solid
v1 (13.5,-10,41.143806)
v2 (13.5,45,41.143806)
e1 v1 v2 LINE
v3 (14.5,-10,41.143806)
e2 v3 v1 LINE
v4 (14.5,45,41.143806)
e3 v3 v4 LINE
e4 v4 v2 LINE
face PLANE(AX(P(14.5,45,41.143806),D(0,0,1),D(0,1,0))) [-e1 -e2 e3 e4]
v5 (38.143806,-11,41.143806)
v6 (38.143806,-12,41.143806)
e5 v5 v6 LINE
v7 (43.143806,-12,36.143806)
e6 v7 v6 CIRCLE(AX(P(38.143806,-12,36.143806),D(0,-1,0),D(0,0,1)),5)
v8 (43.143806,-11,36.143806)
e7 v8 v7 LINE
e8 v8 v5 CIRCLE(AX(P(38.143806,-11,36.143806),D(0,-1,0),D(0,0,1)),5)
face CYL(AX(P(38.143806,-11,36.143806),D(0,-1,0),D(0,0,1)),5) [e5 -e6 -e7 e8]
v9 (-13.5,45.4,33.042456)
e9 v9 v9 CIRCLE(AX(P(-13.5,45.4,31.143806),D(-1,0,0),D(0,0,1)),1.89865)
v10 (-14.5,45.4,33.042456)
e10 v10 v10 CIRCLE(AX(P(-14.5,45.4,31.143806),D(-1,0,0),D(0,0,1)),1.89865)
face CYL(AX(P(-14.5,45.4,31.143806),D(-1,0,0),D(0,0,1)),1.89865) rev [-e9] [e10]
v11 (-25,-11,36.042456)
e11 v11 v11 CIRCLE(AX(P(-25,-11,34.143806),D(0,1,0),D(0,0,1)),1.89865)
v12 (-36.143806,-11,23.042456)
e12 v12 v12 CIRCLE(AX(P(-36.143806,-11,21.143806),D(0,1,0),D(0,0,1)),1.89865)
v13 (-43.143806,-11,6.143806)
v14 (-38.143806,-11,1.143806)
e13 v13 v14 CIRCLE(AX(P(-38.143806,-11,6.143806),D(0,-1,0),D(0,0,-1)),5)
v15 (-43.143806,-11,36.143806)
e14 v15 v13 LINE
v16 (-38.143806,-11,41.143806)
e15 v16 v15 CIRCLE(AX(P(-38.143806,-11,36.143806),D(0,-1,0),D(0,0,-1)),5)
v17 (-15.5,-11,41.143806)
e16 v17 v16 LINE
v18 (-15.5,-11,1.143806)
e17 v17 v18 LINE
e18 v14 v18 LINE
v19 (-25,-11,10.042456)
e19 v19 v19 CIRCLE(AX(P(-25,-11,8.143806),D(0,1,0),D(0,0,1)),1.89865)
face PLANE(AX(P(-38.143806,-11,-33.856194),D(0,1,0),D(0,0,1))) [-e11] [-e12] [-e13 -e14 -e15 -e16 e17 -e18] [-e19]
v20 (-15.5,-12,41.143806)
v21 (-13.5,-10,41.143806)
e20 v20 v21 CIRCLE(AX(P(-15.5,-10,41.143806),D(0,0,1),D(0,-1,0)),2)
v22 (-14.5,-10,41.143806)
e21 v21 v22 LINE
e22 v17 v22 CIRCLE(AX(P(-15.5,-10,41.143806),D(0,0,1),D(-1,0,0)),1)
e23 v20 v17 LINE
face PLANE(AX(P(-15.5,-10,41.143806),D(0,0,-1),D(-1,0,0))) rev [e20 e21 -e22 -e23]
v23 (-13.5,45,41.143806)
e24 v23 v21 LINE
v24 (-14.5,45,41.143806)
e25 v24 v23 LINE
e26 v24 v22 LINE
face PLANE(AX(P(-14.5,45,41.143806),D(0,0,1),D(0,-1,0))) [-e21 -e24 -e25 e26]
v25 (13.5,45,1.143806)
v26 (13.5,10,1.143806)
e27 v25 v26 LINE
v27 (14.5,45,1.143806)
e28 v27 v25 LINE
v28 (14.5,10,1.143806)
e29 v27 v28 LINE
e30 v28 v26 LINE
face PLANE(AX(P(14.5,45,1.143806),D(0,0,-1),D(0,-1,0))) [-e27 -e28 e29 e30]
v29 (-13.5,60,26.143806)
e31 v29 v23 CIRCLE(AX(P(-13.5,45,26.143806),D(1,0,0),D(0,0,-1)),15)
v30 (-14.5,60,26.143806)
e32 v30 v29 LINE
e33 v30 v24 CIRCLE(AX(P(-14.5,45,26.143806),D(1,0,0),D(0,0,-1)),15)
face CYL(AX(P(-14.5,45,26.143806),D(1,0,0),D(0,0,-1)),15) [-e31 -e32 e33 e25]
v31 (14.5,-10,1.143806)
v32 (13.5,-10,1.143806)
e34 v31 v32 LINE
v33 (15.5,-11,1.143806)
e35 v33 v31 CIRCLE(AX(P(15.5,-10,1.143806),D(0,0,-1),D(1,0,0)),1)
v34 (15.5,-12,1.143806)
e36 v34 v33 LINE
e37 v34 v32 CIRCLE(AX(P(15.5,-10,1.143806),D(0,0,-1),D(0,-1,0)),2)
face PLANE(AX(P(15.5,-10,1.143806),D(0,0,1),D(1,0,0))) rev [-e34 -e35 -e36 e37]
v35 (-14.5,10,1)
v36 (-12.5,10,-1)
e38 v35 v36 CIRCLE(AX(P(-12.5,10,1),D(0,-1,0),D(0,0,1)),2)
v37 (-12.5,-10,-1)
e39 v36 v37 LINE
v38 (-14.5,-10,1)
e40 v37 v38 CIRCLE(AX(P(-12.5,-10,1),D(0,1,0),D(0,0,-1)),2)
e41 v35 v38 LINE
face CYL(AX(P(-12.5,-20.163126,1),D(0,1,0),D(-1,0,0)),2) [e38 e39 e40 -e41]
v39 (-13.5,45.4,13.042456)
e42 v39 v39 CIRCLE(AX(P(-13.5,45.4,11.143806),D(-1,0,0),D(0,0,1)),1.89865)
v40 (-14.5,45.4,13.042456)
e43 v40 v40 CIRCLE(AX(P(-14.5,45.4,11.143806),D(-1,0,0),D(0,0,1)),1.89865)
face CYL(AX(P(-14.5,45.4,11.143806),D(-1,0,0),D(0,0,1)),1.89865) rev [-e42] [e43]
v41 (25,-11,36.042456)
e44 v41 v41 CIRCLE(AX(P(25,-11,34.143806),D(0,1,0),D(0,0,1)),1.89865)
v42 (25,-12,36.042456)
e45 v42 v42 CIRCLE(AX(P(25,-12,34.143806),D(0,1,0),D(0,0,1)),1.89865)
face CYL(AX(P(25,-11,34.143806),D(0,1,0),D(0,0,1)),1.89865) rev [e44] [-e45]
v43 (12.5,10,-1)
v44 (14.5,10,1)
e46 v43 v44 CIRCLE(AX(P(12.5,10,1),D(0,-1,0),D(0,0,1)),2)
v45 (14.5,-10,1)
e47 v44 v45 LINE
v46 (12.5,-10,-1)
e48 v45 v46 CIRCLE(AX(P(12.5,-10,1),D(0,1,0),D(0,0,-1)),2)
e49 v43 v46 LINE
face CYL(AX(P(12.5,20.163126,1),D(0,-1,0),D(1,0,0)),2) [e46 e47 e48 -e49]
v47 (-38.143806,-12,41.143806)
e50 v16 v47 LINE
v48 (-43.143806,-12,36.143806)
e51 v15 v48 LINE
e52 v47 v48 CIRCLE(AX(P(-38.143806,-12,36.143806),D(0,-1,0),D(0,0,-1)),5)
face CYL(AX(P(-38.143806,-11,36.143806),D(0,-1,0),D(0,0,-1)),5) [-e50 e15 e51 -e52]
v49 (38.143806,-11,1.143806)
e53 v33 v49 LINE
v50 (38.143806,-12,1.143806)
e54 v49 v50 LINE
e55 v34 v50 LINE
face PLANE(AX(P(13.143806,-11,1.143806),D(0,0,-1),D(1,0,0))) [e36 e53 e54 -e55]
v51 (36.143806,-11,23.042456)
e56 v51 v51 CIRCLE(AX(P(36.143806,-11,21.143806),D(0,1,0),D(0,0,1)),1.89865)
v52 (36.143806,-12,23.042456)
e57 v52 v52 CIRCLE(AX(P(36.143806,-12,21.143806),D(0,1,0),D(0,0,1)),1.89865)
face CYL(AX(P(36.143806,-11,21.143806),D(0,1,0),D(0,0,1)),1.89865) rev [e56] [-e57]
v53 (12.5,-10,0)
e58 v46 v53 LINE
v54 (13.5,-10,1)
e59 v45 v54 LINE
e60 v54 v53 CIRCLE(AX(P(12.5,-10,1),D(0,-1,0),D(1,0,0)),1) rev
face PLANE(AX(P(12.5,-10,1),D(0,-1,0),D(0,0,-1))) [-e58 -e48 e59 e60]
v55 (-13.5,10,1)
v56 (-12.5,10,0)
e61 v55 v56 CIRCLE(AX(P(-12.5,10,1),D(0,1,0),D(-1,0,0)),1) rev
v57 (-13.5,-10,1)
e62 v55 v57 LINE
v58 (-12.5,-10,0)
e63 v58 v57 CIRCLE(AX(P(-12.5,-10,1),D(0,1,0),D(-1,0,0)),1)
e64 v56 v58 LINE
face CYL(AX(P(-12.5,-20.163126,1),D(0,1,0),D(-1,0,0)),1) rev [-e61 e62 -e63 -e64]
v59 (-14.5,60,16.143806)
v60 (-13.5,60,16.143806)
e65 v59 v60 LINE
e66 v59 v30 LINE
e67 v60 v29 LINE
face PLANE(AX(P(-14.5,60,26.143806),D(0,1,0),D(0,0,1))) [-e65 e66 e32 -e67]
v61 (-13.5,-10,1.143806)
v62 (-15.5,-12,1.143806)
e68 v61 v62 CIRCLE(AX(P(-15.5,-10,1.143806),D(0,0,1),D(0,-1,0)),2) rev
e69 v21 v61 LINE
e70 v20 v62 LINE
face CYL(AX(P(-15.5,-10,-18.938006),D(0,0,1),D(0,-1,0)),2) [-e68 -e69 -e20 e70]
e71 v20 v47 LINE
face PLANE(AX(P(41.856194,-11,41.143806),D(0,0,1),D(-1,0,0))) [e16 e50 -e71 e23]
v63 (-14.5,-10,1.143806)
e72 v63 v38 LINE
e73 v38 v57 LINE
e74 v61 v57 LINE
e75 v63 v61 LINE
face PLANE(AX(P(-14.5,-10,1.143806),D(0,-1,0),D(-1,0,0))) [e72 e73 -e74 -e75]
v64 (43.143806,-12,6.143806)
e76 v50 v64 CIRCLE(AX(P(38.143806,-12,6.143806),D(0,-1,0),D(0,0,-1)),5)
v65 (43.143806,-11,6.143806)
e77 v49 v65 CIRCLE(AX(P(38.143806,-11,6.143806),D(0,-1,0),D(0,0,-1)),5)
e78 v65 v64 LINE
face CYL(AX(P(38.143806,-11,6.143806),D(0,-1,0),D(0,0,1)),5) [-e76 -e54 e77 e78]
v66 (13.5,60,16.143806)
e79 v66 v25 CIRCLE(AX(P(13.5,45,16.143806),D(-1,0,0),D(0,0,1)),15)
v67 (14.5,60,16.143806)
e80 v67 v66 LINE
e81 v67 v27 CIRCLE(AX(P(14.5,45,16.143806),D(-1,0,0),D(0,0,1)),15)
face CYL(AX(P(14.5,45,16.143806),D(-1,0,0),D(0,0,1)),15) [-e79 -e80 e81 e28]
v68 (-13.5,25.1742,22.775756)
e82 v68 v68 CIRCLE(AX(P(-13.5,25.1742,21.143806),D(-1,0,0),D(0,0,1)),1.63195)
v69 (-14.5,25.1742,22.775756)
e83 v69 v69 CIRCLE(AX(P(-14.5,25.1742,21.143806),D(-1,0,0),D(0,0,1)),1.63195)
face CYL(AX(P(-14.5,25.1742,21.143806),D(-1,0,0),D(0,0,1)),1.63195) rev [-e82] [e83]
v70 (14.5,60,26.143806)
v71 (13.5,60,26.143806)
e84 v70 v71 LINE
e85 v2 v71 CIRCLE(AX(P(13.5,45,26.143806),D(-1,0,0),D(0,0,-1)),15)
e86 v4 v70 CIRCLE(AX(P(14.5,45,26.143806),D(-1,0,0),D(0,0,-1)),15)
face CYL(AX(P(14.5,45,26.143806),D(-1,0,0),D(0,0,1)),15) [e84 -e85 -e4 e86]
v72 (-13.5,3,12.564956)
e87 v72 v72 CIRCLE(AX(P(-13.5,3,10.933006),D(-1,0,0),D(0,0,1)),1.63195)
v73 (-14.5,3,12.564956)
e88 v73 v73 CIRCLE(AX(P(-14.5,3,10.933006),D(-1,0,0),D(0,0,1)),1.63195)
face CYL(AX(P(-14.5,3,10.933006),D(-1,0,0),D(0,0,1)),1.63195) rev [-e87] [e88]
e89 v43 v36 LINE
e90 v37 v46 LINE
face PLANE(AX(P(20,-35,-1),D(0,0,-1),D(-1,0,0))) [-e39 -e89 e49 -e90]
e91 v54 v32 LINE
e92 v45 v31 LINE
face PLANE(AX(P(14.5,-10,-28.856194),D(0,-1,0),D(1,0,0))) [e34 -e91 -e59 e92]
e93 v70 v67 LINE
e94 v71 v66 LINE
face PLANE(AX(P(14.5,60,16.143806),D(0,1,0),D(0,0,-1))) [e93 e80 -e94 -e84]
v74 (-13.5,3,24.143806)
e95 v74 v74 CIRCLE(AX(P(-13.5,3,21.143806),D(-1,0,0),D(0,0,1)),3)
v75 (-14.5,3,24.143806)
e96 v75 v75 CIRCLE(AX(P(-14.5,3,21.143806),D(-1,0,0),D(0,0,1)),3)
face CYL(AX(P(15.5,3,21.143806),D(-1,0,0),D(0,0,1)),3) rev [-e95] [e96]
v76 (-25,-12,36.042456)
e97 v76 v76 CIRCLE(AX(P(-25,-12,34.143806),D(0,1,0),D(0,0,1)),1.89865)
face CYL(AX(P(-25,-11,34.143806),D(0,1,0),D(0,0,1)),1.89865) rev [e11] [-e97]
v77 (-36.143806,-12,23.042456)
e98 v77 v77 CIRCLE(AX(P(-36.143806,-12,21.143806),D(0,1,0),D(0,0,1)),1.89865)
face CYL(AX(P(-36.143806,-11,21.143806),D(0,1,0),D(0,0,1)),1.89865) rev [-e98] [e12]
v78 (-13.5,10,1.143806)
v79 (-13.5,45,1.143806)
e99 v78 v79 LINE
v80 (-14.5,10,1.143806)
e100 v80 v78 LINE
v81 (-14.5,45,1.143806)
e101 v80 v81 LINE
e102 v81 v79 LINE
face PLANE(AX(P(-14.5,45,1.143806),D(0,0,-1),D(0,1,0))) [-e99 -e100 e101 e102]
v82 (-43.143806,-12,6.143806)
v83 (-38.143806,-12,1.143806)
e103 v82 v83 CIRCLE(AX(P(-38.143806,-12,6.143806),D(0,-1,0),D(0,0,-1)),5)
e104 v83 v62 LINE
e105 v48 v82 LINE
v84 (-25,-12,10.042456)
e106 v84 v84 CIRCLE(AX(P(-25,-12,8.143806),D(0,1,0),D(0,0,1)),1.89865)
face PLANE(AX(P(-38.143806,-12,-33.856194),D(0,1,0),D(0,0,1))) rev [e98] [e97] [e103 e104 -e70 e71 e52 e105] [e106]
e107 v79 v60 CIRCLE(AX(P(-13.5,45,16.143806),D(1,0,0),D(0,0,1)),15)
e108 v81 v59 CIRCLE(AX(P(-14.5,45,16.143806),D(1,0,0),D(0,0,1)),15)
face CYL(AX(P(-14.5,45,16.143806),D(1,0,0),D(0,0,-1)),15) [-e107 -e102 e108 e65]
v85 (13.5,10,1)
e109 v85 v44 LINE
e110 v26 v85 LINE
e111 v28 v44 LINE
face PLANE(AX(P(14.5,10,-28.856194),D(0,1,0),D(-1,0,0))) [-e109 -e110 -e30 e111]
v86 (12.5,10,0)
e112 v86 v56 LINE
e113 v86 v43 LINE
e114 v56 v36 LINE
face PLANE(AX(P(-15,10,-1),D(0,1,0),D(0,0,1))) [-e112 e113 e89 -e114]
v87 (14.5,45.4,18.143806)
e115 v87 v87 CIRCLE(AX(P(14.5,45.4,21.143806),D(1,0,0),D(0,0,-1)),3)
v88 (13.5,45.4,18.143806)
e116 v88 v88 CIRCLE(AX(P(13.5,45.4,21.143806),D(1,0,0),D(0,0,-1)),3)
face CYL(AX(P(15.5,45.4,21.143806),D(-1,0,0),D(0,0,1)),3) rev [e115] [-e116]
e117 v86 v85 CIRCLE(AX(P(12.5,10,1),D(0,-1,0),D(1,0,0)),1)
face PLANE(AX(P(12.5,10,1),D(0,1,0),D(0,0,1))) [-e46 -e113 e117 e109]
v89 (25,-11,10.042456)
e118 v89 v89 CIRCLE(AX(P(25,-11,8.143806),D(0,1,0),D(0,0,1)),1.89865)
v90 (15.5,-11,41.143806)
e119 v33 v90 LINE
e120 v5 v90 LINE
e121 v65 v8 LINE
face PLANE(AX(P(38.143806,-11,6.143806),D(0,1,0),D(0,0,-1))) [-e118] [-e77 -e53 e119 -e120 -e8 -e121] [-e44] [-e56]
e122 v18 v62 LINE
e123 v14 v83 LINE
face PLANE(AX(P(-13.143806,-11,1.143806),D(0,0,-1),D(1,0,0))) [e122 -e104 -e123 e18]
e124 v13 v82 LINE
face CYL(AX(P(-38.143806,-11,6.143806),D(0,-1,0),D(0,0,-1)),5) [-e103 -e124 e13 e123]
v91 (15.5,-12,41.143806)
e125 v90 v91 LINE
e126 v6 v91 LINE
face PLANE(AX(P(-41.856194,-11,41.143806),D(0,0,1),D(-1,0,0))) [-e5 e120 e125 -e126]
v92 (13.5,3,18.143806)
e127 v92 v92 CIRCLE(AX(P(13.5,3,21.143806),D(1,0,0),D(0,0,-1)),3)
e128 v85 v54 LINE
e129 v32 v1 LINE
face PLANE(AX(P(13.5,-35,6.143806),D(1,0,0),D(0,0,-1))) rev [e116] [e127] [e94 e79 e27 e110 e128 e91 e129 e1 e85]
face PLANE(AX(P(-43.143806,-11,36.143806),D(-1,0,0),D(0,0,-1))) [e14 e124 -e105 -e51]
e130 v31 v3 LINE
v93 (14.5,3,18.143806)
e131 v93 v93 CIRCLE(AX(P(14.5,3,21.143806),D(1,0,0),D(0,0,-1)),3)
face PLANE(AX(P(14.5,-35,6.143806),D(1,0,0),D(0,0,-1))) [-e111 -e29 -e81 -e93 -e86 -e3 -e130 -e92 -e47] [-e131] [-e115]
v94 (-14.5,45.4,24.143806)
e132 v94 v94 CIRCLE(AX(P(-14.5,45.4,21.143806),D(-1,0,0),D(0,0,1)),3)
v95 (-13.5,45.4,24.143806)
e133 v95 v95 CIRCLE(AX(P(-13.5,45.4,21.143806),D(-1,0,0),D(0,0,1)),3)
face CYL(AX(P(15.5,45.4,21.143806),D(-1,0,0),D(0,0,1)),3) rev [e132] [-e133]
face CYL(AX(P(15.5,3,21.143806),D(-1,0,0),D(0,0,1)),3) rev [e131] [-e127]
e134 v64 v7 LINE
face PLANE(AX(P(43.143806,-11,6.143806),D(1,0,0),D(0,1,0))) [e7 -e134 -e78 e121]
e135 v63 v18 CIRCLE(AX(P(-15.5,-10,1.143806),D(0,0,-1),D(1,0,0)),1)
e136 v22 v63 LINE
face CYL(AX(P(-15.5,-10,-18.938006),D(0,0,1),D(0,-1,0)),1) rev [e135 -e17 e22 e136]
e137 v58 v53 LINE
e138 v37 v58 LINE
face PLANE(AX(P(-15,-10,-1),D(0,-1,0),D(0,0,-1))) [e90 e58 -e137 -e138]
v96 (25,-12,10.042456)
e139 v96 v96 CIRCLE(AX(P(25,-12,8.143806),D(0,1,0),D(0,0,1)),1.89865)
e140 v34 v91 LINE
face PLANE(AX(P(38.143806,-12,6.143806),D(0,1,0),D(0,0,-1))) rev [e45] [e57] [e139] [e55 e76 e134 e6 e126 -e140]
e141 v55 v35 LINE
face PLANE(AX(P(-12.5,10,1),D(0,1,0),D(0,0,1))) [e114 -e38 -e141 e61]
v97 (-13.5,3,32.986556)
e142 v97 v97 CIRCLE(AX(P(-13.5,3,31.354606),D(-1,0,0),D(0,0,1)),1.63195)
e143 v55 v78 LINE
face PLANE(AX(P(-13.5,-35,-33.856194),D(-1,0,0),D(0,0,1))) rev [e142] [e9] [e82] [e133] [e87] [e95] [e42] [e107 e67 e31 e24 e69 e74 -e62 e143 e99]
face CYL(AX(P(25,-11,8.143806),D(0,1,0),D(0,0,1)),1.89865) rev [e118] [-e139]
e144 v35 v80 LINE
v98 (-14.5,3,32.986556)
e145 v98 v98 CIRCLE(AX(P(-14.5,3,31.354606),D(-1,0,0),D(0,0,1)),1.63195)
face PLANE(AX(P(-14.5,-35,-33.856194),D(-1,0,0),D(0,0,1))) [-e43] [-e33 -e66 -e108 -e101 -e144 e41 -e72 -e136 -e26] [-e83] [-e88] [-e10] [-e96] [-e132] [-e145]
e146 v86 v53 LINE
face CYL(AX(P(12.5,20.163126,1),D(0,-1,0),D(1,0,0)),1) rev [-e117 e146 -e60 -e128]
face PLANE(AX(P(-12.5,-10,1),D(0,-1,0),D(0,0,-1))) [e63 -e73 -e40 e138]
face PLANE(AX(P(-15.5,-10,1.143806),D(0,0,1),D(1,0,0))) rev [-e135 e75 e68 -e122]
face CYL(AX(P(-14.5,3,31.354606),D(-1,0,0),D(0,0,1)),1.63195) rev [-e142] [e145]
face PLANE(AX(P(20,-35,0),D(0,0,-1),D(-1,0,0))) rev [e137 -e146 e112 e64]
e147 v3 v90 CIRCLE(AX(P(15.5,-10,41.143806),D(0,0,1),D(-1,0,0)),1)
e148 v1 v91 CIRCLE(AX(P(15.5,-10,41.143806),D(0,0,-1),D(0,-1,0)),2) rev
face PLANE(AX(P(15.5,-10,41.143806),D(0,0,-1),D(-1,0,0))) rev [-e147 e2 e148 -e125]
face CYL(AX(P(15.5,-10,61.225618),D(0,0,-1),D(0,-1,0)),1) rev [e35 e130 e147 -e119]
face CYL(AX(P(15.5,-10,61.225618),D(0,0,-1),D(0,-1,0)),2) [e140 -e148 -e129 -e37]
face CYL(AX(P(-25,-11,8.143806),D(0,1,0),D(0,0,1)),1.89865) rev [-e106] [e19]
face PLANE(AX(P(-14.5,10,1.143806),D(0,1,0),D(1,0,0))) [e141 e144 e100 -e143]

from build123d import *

# Parameters (mm, degrees)
BASE_FLANGE1_DEPTH         = 1
SKETCHED_START             = -40
SKETCHED_BEND3_OUTLINE_W   = 40
SKETCHED_BEND3_OUTLINE_H   = 1
SKETCHED_BEND3_DEPTH       = 28.18876
SKETCHED_START_2           = -11.2192
SKETCHED_BEND3_2_DEPTH     = 0.2192
SKETCHED_START_3           = -12
SKETCHED_BEND3_3_DEPTH     = 2
SKETCHED_START_4           = -56
SKETCHED_BEND3_4_DEPTH     = 112
SKETCHED_BEND7_DEPTH       = 72
SKETCHED_START_5           = -10
SKETCHED_BEND7_2_OUTLINE_W = 1
SKETCHED_BEND7_2_OUTLINE_H = 40
SKETCHED_BEND7_2_DEPTH     = 55
SKETCHED_BEND7_3_DEPTH     = 20
SKETCHED_BEND7_4_DEPTH     = 2
SKETCHED_START_6           = 45
SKETCHED_BEND7_5_OUTLINE_W = 1
SKETCHED_BEND7_5_OUTLINE_H = 40
SKETCHED_BEND7_5_DEPTH     = 15
SKETCHED_START_7           = 1.14380551
SKETCHED_BEND7_6_DEPTH     = 40
SKETCHED_START_8           = -38.14380551
SKETCHED_BEND7_7_DEPTH     = 76.28761102
SKETCH9_R                  = 3
CUT_EXTRUDE1_DEPTH         = 30
F_4_CLEARANCE_HOLE1_D      = 3.2639
F_4_CLEARANCE_HOLE1_DEPTH  = 3
F_4_CLEARANCE_HOLE1_TIP    = 0.980574487
F_6_CLEARANCE_HOLE1_D      = 3.7973
F_6_CLEARANCE_HOLE1_DEPTH  = 3
F_6_CLEARANCE_HOLE1_TIP    = 1.140824014
F_6_CLEARANCE_HOLE2_D      = 3.7973


with BuildPart() as part:
    # Base-Flange1: sheet metal written as solids
    # Sketch1 → Base-Flange1 (new body)
    with BuildSketch(Plane.XY):
        with BuildLine():
            Line((-15, -10), (-15, -35))
            ThreePointArc((-15, -35), (-16.464466094, -38.535533906), (-20, -40))
            Line((-20, -40), (-50, -40))
            ThreePointArc((-50, -40), (-53.535533906, -38.535533906), (-55, -35))
            Line((-55, -35), (-55, 45))
            ThreePointArc((-55, 45), (-50.606601718, 55.606601718), (-40, 60))
            Line((-40, 60), (-30, 60))
            ThreePointArc((-30, 60), (-19.393398282, 55.606601718), (-15, 45))
            Line((-15, 45), (-15, 10))
            Line((-15, 10), (15, 10))
            Line((15, 10), (15, 45))
            ThreePointArc((15, 45), (19.393398282, 55.606601718), (30, 60))
            Line((30, 60), (40, 60))
            ThreePointArc((40, 60), (50.606601718, 55.606601718), (55, 45))
            Line((55, 45), (55, -35))
            ThreePointArc((55, -35), (53.535533906, -38.535533906), (50, -40))
            Line((50, -40), (20, -40))
            ThreePointArc((20, -40), (16.464466094, -38.535533906), (15, -35))
            Line((15, -35), (15, -10))
            Line((15, -10), (-15, -10))
        make_face()
    extrude(amount=-BASE_FLANGE1_DEPTH)

    # Sketched Bend3: read off the stored shape, not the designer's step
    # Sketched Bend3 outline → Sketched Bend3 (cut)
    with BuildSketch(Plane(origin=(0, 0, 0), x_dir=(1, 0, 0), z_dir=(0, 1, 0)).offset(SKETCHED_START)):
        with Locations((-35, 0.5)):
            Rectangle(SKETCHED_BEND3_OUTLINE_W, SKETCHED_BEND3_OUTLINE_H)
        with Locations((35, 0.5)):
            Rectangle(SKETCHED_BEND3_OUTLINE_W, SKETCHED_BEND3_OUTLINE_H)
    extrude(amount=SKETCHED_BEND3_DEPTH, mode=Mode.SUBTRACT)

    # Sketched Bend3 2 outline → Sketched Bend3 2 (add)
    with BuildSketch(Plane(origin=(0, 0, 0), x_dir=(1, 0, 0), z_dir=(0, 1, 0)).offset(SKETCHED_START_2)):
        with BuildLine():
            Line((-15, 1), (-15, 24.64380551))
            ThreePointArc((-15, 24.64380551), (-16.464466094, 28.179339416), (-20, 29.64380551))
            Line((-20, 29.64380551), (-50, 29.64380551))
            ThreePointArc((-50, 29.64380551), (-53.535533906, 28.179339416), (-55, 24.64380551))
            Line((-55, 24.64380551), (-55, 1))
            Line((-55, 1), (-15, 1))
        make_face()
        with BuildLine():
            Line((15, 24.64380551), (15, 1))
            Line((15, 1), (55, 1))
            Line((55, 1), (55, 24.64380551))
            ThreePointArc((55, 24.64380551), (53.535533906, 28.179339416), (50, 29.64380551))
            Line((50, 29.64380551), (20, 29.64380551))
            ThreePointArc((20, 29.64380551), (16.464466094, 28.179339416), (15, 24.64380551))
        make_face()
    extrude(amount=SKETCHED_BEND3_2_DEPTH)

    # Sketched Bend3 3 outline → Sketched Bend3 3 (add)
    with BuildSketch(Plane(origin=(0, 0, 0), x_dir=(1, 0, 0), z_dir=(0, 1, 0)).offset(SKETCHED_START_3)):
        with BuildLine():
            Line((-15, 1), (-15, 24.64380551))
            ThreePointArc((-15, 24.64380551), (-16.464466094, 28.179339416), (-20, 29.64380551))
            Line((-20, 29.64380551), (-50, 29.64380551))
            ThreePointArc((-50, 29.64380551), (-53.535533906, 28.179339416), (-55, 24.64380551))
            Line((-55, 24.64380551), (-55, 1))
            Line((-55, 1), (-15, 1))
        make_face()
        with BuildLine():
            ThreePointArc((55, 24.64380551), (53.535533906, 28.179339416), (50, 29.64380551))
            Line((50, 29.64380551), (20, 29.64380551))
            ThreePointArc((20, 29.64380551), (16.464466094, 28.179339416), (15, 24.64380551))
            Line((15, 24.64380551), (15, 1))
            Line((15, 1), (55, 1))
            Line((55, 1), (55, 24.64380551))
        make_face()
    extrude(amount=SKETCHED_BEND3_3_DEPTH)

    # Sketched Bend3 4 outline → Sketched Bend3 4 (cut)
    with BuildSketch(Plane.YZ.offset(SKETCHED_START_4)):
        with BuildLine():
            Line((-11, -2), (-11, -29.64380551))
            Line((-11, -29.64380551), (-10, -29.64380551))
            Line((-10, -29.64380551), (-10, -1))
            ThreePointArc((-10, -1), (-10.707106781, -1.292893219), (-11, -2))
        make_face()
        with BuildLine():
            Line((-12, -1), (-12, -2))
            ThreePointArc((-12, -2), (-11.414213562, -0.585786438), (-10, 0))
            Line((-10, 0), (-11.81124, 0))
            Line((-11.81124, 0), (-11.81124, -1))
            Line((-11.81124, -1), (-12, -1))
        make_face()
    extrude(amount=SKETCHED_BEND3_4_DEPTH, mode=Mode.SUBTRACT)

    # Sketched Bend7: read off the stored shape, not the designer's step
    # Sketched Bend7 outline → Sketched Bend7 (cut)
    with BuildSketch(Plane(origin=(0, 0, 0), x_dir=(1, 0, 0), z_dir=(0, 1, 0)).offset(SKETCHED_START_3)):
        with BuildLine():
            ThreePointArc((-14.232050807, 0), (-13.5, 0.732050807), (-12.5, 1))
            Line((-12.5, 1), (-15, 1))
            Line((-15, 1), (-15, 24.64380551))
            ThreePointArc((-15, 24.64380551), (-16.464466094, 28.179339416), (-20, 29.64380551))
            Line((-20, 29.64380551), (-50, 29.64380551))
            ThreePointArc((-50, 29.64380551), (-53.535533906, 28.179339416), (-55, 24.64380551))
            Line((-55, 24.64380551), (-55, 0))
            Line((-55, 0), (-14.232050807, 0))
        make_face()
        with BuildLine():
            Line((15, 1), (12.5, 1))
            ThreePointArc((12.5, 1), (13.5, 0.732050807), (14.232050807, 0))
            Line((14.232050807, 0), (55, 0))
            Line((55, 0), (55, 24.64380551))
            ThreePointArc((55, 24.64380551), (53.535533906, 28.179339416), (50, 29.64380551))
            Line((50, 29.64380551), (20, 29.64380551))
            ThreePointArc((20, 29.64380551), (16.464466094, 28.179339416), (15, 24.64380551))
            Line((15, 24.64380551), (15, 1))
        make_face()
    extrude(amount=SKETCHED_BEND7_DEPTH, mode=Mode.SUBTRACT)



with BuildPart() as body_2:
    # Sketched Bend7 2 outline → Sketched Bend7 2 (new body)
    with BuildSketch(Plane(origin=(0, 0, 0), x_dir=(1, 0, 0), z_dir=(0, 1, 0)).offset(SKETCHED_START_5)):
        with Locations((-14, -21.14380551)):
            Rectangle(SKETCHED_BEND7_2_OUTLINE_W, SKETCHED_BEND7_2_OUTLINE_H)
        with Locations((14, -21.14380551)):
            Rectangle(SKETCHED_BEND7_2_OUTLINE_W, SKETCHED_BEND7_2_OUTLINE_H)
    extrude(amount=SKETCHED_BEND7_2_DEPTH)


with BuildPart() as part_1:
    add(part.part)

    add(body_2.part)  # Sketched Bend7 3 merges body 2
    # Sketched Bend7 3 outline → Sketched Bend7 3 (add)
    with BuildSketch(Plane(origin=(0, 0, 0), x_dir=(1, 0, 0), z_dir=(0, 1, 0)).offset(SKETCHED_START_5)):
        with BuildLine():
            Line((-12.5, 0), (-14.232050807, 0))
            ThreePointArc((-14.232050807, 0), (-14.431851652, -0.48236191), (-14.5, -1))
            Line((-14.5, -1), (-14.5, -1.14380551))
            Line((-14.5, -1.14380551), (-13.5, -1.14380551))
            Line((-13.5, -1.14380551), (-13.5, -1))
            ThreePointArc((-13.5, -1), (-13.207106781, -0.292893219), (-12.5, 0))
        make_face()
        with BuildLine():
            ThreePointArc((14.5, -1), (14.431851652, -0.48236191), (14.232050807, 0))
            Line((14.232050807, 0), (12.5, 0))
            ThreePointArc((12.5, 0), (13.207106781, -0.292893219), (13.5, -1))
            Line((13.5, -1), (13.5, -1.14380551))
            Line((13.5, -1.14380551), (14.5, -1.14380551))
            Line((14.5, -1.14380551), (14.5, -1))
        make_face()
    extrude(amount=SKETCHED_BEND7_3_DEPTH)

    # Sketched Bend7 4 outline → Sketched Bend7 4 (add)
    with BuildSketch(Plane(origin=(0, 0, 0), x_dir=(1, 0, 0), z_dir=(0, 1, 0)).offset(SKETCHED_START_3)):
        with BuildLine():
            ThreePointArc((-43.14380551, -36.14380551), (-41.679339416, -39.679339416), (-38.14380551, -41.14380551))
            Line((-38.14380551, -41.14380551), (-13.5, -41.14380551))
            Line((-13.5, -41.14380551), (-13.5, -1.14380551))
            Line((-13.5, -1.14380551), (-38.14380551, -1.14380551))
            ThreePointArc((-38.14380551, -1.14380551), (-41.679339416, -2.608271604), (-43.14380551, -6.14380551))
            Line((-43.14380551, -6.14380551), (-43.14380551, -36.14380551))
        make_face()
        with BuildLine():
            ThreePointArc((38.14380551, -41.14380551), (41.679339416, -39.679339416), (43.14380551, -36.14380551))
            Line((43.14380551, -36.14380551), (43.14380551, -6.14380551))
            ThreePointArc((43.14380551, -6.14380551), (41.679339416, -2.608271604), (38.14380551, -1.14380551))
            Line((38.14380551, -1.14380551), (13.5, -1.14380551))
            Line((13.5, -1.14380551), (13.5, -41.14380551))
            Line((13.5, -41.14380551), (38.14380551, -41.14380551))
        make_face()
    extrude(amount=SKETCHED_BEND7_4_DEPTH)

    # Sketched Bend7 5 outline → Sketched Bend7 5 (add)
    with BuildSketch(Plane(origin=(0, 0, 0), x_dir=(1, 0, 0), z_dir=(0, 1, 0)).offset(SKETCHED_START_6)):
        with Locations((-14, -21.14380551)):
            Rectangle(SKETCHED_BEND7_5_OUTLINE_W, SKETCHED_BEND7_5_OUTLINE_H)
        with Locations((14, -21.14380551)):
            Rectangle(SKETCHED_BEND7_5_OUTLINE_W, SKETCHED_BEND7_5_OUTLINE_H)
    extrude(amount=SKETCHED_BEND7_5_DEPTH)

    # Sketched Bend7 6 outline → Sketched Bend7 6 (cut)
    with BuildSketch(Plane.XY.offset(SKETCHED_START_7)):
        with BuildLine():
            Line((-43.14380551, -11), (-15.5, -11))
            ThreePointArc((-15.5, -11), (-14.792893219, -10.707106781), (-14.5, -10))
            Line((-14.5, -10), (-43.14380551, -10))
            Line((-43.14380551, -10), (-43.14380551, -11))
        make_face()
        with BuildLine():
            ThreePointArc((-13.5, -10), (-14.085786438, -11.414213562), (-15.5, -12))
            Line((-15.5, -12), (-13.5, -12))
            Line((-13.5, -12), (-13.5, -10))
        make_face()
        with BuildLine():
            Line((15.5, -11), (43.14380551, -11))
            Line((43.14380551, -11), (43.14380551, -10))
            Line((43.14380551, -10), (14.5, -10))
            ThreePointArc((14.5, -10), (14.792893219, -10.707106781), (15.5, -11))
        make_face()
        with BuildLine():
            Line((13.5, -12), (15.5, -12))
            ThreePointArc((15.5, -12), (14.085786438, -11.414213562), (13.5, -10))
            Line((13.5, -10), (13.5, -12))
        make_face()
    extrude(amount=SKETCHED_BEND7_6_DEPTH, mode=Mode.SUBTRACT)

    # Sketched Bend7 7 outline → Sketched Bend7 7 (cut)
    with BuildSketch(Plane.YZ.offset(SKETCHED_START_8)):
        with BuildLine():
            ThreePointArc((45, 41.14380551), (55.606601718, 36.750407228), (60, 26.14380551))
            Line((60, 26.14380551), (60, 41.14380551))
            Line((60, 41.14380551), (45, 41.14380551))
        make_face()
        with BuildLine():
            ThreePointArc((60, 16.14380551), (55.606601718, 5.537203792), (45, 1.14380551))
            Line((45, 1.14380551), (60, 1.14380551))
            Line((60, 1.14380551), (60, 16.14380551))
        make_face()
    extrude(amount=SKETCHED_BEND7_7_DEPTH, mode=Mode.SUBTRACT)

    # Sketch9 → Cut-Extrude1 (cut)
    with BuildSketch(Plane.ZY.offset(14.5)):
        with Locations(Location((21.14380551, 3, 0), (0, 0, 180))):
            Circle(SKETCH9_R)
        with Locations(Location((21.14380551, 45.4, 0), (0, 0, 180))):
            Circle(SKETCH9_R)
    extrude(amount=-CUT_EXTRUDE1_DEPTH, mode=Mode.SUBTRACT)

    # #4 Clearance Hole1
    with Locations(Plane.ZY.offset(14.5)):
        with Locations((10.93300551, 3), (31.35460551, 3), (21.14380551, 25.1742)):
            Hole(F_4_CLEARANCE_HOLE1_D / 2, depth=F_4_CLEARANCE_HOLE1_DEPTH)
            with Locations((0, 0, -(F_4_CLEARANCE_HOLE1_DEPTH + F_4_CLEARANCE_HOLE1_TIP / 2))):  # 118° drill point
                Cone(0, F_4_CLEARANCE_HOLE1_D / 2, F_4_CLEARANCE_HOLE1_TIP, mode=Mode.SUBTRACT)

    # #6 Clearance Hole1
    with Locations(Plane.ZY.offset(14.5)):
        with Locations((11.14380551, 45.4), (31.14380551, 45.4)):
            Hole(F_6_CLEARANCE_HOLE1_D / 2, depth=F_6_CLEARANCE_HOLE1_DEPTH)
            with Locations((0, 0, -(F_6_CLEARANCE_HOLE1_DEPTH + F_6_CLEARANCE_HOLE1_TIP / 2))):  # 118° drill point
                Cone(0, F_6_CLEARANCE_HOLE1_D / 2, F_6_CLEARANCE_HOLE1_TIP, mode=Mode.SUBTRACT)

    # #6 Clearance Hole2 (through all)
    with Locations(Plane(origin=(0, -11, 0), x_dir=(1, 0, 0), z_dir=(0, 1, 0))):
        with Locations((-36.14380551, -21.14380551), (-25, -34.14380551), (25, -34.14380551), (36.14380551, -21.14380551), (-25, -8.14380551), (25, -8.14380551)):
            Hole(F_6_CLEARANCE_HOLE2_D / 2)


solid = part_1.part
